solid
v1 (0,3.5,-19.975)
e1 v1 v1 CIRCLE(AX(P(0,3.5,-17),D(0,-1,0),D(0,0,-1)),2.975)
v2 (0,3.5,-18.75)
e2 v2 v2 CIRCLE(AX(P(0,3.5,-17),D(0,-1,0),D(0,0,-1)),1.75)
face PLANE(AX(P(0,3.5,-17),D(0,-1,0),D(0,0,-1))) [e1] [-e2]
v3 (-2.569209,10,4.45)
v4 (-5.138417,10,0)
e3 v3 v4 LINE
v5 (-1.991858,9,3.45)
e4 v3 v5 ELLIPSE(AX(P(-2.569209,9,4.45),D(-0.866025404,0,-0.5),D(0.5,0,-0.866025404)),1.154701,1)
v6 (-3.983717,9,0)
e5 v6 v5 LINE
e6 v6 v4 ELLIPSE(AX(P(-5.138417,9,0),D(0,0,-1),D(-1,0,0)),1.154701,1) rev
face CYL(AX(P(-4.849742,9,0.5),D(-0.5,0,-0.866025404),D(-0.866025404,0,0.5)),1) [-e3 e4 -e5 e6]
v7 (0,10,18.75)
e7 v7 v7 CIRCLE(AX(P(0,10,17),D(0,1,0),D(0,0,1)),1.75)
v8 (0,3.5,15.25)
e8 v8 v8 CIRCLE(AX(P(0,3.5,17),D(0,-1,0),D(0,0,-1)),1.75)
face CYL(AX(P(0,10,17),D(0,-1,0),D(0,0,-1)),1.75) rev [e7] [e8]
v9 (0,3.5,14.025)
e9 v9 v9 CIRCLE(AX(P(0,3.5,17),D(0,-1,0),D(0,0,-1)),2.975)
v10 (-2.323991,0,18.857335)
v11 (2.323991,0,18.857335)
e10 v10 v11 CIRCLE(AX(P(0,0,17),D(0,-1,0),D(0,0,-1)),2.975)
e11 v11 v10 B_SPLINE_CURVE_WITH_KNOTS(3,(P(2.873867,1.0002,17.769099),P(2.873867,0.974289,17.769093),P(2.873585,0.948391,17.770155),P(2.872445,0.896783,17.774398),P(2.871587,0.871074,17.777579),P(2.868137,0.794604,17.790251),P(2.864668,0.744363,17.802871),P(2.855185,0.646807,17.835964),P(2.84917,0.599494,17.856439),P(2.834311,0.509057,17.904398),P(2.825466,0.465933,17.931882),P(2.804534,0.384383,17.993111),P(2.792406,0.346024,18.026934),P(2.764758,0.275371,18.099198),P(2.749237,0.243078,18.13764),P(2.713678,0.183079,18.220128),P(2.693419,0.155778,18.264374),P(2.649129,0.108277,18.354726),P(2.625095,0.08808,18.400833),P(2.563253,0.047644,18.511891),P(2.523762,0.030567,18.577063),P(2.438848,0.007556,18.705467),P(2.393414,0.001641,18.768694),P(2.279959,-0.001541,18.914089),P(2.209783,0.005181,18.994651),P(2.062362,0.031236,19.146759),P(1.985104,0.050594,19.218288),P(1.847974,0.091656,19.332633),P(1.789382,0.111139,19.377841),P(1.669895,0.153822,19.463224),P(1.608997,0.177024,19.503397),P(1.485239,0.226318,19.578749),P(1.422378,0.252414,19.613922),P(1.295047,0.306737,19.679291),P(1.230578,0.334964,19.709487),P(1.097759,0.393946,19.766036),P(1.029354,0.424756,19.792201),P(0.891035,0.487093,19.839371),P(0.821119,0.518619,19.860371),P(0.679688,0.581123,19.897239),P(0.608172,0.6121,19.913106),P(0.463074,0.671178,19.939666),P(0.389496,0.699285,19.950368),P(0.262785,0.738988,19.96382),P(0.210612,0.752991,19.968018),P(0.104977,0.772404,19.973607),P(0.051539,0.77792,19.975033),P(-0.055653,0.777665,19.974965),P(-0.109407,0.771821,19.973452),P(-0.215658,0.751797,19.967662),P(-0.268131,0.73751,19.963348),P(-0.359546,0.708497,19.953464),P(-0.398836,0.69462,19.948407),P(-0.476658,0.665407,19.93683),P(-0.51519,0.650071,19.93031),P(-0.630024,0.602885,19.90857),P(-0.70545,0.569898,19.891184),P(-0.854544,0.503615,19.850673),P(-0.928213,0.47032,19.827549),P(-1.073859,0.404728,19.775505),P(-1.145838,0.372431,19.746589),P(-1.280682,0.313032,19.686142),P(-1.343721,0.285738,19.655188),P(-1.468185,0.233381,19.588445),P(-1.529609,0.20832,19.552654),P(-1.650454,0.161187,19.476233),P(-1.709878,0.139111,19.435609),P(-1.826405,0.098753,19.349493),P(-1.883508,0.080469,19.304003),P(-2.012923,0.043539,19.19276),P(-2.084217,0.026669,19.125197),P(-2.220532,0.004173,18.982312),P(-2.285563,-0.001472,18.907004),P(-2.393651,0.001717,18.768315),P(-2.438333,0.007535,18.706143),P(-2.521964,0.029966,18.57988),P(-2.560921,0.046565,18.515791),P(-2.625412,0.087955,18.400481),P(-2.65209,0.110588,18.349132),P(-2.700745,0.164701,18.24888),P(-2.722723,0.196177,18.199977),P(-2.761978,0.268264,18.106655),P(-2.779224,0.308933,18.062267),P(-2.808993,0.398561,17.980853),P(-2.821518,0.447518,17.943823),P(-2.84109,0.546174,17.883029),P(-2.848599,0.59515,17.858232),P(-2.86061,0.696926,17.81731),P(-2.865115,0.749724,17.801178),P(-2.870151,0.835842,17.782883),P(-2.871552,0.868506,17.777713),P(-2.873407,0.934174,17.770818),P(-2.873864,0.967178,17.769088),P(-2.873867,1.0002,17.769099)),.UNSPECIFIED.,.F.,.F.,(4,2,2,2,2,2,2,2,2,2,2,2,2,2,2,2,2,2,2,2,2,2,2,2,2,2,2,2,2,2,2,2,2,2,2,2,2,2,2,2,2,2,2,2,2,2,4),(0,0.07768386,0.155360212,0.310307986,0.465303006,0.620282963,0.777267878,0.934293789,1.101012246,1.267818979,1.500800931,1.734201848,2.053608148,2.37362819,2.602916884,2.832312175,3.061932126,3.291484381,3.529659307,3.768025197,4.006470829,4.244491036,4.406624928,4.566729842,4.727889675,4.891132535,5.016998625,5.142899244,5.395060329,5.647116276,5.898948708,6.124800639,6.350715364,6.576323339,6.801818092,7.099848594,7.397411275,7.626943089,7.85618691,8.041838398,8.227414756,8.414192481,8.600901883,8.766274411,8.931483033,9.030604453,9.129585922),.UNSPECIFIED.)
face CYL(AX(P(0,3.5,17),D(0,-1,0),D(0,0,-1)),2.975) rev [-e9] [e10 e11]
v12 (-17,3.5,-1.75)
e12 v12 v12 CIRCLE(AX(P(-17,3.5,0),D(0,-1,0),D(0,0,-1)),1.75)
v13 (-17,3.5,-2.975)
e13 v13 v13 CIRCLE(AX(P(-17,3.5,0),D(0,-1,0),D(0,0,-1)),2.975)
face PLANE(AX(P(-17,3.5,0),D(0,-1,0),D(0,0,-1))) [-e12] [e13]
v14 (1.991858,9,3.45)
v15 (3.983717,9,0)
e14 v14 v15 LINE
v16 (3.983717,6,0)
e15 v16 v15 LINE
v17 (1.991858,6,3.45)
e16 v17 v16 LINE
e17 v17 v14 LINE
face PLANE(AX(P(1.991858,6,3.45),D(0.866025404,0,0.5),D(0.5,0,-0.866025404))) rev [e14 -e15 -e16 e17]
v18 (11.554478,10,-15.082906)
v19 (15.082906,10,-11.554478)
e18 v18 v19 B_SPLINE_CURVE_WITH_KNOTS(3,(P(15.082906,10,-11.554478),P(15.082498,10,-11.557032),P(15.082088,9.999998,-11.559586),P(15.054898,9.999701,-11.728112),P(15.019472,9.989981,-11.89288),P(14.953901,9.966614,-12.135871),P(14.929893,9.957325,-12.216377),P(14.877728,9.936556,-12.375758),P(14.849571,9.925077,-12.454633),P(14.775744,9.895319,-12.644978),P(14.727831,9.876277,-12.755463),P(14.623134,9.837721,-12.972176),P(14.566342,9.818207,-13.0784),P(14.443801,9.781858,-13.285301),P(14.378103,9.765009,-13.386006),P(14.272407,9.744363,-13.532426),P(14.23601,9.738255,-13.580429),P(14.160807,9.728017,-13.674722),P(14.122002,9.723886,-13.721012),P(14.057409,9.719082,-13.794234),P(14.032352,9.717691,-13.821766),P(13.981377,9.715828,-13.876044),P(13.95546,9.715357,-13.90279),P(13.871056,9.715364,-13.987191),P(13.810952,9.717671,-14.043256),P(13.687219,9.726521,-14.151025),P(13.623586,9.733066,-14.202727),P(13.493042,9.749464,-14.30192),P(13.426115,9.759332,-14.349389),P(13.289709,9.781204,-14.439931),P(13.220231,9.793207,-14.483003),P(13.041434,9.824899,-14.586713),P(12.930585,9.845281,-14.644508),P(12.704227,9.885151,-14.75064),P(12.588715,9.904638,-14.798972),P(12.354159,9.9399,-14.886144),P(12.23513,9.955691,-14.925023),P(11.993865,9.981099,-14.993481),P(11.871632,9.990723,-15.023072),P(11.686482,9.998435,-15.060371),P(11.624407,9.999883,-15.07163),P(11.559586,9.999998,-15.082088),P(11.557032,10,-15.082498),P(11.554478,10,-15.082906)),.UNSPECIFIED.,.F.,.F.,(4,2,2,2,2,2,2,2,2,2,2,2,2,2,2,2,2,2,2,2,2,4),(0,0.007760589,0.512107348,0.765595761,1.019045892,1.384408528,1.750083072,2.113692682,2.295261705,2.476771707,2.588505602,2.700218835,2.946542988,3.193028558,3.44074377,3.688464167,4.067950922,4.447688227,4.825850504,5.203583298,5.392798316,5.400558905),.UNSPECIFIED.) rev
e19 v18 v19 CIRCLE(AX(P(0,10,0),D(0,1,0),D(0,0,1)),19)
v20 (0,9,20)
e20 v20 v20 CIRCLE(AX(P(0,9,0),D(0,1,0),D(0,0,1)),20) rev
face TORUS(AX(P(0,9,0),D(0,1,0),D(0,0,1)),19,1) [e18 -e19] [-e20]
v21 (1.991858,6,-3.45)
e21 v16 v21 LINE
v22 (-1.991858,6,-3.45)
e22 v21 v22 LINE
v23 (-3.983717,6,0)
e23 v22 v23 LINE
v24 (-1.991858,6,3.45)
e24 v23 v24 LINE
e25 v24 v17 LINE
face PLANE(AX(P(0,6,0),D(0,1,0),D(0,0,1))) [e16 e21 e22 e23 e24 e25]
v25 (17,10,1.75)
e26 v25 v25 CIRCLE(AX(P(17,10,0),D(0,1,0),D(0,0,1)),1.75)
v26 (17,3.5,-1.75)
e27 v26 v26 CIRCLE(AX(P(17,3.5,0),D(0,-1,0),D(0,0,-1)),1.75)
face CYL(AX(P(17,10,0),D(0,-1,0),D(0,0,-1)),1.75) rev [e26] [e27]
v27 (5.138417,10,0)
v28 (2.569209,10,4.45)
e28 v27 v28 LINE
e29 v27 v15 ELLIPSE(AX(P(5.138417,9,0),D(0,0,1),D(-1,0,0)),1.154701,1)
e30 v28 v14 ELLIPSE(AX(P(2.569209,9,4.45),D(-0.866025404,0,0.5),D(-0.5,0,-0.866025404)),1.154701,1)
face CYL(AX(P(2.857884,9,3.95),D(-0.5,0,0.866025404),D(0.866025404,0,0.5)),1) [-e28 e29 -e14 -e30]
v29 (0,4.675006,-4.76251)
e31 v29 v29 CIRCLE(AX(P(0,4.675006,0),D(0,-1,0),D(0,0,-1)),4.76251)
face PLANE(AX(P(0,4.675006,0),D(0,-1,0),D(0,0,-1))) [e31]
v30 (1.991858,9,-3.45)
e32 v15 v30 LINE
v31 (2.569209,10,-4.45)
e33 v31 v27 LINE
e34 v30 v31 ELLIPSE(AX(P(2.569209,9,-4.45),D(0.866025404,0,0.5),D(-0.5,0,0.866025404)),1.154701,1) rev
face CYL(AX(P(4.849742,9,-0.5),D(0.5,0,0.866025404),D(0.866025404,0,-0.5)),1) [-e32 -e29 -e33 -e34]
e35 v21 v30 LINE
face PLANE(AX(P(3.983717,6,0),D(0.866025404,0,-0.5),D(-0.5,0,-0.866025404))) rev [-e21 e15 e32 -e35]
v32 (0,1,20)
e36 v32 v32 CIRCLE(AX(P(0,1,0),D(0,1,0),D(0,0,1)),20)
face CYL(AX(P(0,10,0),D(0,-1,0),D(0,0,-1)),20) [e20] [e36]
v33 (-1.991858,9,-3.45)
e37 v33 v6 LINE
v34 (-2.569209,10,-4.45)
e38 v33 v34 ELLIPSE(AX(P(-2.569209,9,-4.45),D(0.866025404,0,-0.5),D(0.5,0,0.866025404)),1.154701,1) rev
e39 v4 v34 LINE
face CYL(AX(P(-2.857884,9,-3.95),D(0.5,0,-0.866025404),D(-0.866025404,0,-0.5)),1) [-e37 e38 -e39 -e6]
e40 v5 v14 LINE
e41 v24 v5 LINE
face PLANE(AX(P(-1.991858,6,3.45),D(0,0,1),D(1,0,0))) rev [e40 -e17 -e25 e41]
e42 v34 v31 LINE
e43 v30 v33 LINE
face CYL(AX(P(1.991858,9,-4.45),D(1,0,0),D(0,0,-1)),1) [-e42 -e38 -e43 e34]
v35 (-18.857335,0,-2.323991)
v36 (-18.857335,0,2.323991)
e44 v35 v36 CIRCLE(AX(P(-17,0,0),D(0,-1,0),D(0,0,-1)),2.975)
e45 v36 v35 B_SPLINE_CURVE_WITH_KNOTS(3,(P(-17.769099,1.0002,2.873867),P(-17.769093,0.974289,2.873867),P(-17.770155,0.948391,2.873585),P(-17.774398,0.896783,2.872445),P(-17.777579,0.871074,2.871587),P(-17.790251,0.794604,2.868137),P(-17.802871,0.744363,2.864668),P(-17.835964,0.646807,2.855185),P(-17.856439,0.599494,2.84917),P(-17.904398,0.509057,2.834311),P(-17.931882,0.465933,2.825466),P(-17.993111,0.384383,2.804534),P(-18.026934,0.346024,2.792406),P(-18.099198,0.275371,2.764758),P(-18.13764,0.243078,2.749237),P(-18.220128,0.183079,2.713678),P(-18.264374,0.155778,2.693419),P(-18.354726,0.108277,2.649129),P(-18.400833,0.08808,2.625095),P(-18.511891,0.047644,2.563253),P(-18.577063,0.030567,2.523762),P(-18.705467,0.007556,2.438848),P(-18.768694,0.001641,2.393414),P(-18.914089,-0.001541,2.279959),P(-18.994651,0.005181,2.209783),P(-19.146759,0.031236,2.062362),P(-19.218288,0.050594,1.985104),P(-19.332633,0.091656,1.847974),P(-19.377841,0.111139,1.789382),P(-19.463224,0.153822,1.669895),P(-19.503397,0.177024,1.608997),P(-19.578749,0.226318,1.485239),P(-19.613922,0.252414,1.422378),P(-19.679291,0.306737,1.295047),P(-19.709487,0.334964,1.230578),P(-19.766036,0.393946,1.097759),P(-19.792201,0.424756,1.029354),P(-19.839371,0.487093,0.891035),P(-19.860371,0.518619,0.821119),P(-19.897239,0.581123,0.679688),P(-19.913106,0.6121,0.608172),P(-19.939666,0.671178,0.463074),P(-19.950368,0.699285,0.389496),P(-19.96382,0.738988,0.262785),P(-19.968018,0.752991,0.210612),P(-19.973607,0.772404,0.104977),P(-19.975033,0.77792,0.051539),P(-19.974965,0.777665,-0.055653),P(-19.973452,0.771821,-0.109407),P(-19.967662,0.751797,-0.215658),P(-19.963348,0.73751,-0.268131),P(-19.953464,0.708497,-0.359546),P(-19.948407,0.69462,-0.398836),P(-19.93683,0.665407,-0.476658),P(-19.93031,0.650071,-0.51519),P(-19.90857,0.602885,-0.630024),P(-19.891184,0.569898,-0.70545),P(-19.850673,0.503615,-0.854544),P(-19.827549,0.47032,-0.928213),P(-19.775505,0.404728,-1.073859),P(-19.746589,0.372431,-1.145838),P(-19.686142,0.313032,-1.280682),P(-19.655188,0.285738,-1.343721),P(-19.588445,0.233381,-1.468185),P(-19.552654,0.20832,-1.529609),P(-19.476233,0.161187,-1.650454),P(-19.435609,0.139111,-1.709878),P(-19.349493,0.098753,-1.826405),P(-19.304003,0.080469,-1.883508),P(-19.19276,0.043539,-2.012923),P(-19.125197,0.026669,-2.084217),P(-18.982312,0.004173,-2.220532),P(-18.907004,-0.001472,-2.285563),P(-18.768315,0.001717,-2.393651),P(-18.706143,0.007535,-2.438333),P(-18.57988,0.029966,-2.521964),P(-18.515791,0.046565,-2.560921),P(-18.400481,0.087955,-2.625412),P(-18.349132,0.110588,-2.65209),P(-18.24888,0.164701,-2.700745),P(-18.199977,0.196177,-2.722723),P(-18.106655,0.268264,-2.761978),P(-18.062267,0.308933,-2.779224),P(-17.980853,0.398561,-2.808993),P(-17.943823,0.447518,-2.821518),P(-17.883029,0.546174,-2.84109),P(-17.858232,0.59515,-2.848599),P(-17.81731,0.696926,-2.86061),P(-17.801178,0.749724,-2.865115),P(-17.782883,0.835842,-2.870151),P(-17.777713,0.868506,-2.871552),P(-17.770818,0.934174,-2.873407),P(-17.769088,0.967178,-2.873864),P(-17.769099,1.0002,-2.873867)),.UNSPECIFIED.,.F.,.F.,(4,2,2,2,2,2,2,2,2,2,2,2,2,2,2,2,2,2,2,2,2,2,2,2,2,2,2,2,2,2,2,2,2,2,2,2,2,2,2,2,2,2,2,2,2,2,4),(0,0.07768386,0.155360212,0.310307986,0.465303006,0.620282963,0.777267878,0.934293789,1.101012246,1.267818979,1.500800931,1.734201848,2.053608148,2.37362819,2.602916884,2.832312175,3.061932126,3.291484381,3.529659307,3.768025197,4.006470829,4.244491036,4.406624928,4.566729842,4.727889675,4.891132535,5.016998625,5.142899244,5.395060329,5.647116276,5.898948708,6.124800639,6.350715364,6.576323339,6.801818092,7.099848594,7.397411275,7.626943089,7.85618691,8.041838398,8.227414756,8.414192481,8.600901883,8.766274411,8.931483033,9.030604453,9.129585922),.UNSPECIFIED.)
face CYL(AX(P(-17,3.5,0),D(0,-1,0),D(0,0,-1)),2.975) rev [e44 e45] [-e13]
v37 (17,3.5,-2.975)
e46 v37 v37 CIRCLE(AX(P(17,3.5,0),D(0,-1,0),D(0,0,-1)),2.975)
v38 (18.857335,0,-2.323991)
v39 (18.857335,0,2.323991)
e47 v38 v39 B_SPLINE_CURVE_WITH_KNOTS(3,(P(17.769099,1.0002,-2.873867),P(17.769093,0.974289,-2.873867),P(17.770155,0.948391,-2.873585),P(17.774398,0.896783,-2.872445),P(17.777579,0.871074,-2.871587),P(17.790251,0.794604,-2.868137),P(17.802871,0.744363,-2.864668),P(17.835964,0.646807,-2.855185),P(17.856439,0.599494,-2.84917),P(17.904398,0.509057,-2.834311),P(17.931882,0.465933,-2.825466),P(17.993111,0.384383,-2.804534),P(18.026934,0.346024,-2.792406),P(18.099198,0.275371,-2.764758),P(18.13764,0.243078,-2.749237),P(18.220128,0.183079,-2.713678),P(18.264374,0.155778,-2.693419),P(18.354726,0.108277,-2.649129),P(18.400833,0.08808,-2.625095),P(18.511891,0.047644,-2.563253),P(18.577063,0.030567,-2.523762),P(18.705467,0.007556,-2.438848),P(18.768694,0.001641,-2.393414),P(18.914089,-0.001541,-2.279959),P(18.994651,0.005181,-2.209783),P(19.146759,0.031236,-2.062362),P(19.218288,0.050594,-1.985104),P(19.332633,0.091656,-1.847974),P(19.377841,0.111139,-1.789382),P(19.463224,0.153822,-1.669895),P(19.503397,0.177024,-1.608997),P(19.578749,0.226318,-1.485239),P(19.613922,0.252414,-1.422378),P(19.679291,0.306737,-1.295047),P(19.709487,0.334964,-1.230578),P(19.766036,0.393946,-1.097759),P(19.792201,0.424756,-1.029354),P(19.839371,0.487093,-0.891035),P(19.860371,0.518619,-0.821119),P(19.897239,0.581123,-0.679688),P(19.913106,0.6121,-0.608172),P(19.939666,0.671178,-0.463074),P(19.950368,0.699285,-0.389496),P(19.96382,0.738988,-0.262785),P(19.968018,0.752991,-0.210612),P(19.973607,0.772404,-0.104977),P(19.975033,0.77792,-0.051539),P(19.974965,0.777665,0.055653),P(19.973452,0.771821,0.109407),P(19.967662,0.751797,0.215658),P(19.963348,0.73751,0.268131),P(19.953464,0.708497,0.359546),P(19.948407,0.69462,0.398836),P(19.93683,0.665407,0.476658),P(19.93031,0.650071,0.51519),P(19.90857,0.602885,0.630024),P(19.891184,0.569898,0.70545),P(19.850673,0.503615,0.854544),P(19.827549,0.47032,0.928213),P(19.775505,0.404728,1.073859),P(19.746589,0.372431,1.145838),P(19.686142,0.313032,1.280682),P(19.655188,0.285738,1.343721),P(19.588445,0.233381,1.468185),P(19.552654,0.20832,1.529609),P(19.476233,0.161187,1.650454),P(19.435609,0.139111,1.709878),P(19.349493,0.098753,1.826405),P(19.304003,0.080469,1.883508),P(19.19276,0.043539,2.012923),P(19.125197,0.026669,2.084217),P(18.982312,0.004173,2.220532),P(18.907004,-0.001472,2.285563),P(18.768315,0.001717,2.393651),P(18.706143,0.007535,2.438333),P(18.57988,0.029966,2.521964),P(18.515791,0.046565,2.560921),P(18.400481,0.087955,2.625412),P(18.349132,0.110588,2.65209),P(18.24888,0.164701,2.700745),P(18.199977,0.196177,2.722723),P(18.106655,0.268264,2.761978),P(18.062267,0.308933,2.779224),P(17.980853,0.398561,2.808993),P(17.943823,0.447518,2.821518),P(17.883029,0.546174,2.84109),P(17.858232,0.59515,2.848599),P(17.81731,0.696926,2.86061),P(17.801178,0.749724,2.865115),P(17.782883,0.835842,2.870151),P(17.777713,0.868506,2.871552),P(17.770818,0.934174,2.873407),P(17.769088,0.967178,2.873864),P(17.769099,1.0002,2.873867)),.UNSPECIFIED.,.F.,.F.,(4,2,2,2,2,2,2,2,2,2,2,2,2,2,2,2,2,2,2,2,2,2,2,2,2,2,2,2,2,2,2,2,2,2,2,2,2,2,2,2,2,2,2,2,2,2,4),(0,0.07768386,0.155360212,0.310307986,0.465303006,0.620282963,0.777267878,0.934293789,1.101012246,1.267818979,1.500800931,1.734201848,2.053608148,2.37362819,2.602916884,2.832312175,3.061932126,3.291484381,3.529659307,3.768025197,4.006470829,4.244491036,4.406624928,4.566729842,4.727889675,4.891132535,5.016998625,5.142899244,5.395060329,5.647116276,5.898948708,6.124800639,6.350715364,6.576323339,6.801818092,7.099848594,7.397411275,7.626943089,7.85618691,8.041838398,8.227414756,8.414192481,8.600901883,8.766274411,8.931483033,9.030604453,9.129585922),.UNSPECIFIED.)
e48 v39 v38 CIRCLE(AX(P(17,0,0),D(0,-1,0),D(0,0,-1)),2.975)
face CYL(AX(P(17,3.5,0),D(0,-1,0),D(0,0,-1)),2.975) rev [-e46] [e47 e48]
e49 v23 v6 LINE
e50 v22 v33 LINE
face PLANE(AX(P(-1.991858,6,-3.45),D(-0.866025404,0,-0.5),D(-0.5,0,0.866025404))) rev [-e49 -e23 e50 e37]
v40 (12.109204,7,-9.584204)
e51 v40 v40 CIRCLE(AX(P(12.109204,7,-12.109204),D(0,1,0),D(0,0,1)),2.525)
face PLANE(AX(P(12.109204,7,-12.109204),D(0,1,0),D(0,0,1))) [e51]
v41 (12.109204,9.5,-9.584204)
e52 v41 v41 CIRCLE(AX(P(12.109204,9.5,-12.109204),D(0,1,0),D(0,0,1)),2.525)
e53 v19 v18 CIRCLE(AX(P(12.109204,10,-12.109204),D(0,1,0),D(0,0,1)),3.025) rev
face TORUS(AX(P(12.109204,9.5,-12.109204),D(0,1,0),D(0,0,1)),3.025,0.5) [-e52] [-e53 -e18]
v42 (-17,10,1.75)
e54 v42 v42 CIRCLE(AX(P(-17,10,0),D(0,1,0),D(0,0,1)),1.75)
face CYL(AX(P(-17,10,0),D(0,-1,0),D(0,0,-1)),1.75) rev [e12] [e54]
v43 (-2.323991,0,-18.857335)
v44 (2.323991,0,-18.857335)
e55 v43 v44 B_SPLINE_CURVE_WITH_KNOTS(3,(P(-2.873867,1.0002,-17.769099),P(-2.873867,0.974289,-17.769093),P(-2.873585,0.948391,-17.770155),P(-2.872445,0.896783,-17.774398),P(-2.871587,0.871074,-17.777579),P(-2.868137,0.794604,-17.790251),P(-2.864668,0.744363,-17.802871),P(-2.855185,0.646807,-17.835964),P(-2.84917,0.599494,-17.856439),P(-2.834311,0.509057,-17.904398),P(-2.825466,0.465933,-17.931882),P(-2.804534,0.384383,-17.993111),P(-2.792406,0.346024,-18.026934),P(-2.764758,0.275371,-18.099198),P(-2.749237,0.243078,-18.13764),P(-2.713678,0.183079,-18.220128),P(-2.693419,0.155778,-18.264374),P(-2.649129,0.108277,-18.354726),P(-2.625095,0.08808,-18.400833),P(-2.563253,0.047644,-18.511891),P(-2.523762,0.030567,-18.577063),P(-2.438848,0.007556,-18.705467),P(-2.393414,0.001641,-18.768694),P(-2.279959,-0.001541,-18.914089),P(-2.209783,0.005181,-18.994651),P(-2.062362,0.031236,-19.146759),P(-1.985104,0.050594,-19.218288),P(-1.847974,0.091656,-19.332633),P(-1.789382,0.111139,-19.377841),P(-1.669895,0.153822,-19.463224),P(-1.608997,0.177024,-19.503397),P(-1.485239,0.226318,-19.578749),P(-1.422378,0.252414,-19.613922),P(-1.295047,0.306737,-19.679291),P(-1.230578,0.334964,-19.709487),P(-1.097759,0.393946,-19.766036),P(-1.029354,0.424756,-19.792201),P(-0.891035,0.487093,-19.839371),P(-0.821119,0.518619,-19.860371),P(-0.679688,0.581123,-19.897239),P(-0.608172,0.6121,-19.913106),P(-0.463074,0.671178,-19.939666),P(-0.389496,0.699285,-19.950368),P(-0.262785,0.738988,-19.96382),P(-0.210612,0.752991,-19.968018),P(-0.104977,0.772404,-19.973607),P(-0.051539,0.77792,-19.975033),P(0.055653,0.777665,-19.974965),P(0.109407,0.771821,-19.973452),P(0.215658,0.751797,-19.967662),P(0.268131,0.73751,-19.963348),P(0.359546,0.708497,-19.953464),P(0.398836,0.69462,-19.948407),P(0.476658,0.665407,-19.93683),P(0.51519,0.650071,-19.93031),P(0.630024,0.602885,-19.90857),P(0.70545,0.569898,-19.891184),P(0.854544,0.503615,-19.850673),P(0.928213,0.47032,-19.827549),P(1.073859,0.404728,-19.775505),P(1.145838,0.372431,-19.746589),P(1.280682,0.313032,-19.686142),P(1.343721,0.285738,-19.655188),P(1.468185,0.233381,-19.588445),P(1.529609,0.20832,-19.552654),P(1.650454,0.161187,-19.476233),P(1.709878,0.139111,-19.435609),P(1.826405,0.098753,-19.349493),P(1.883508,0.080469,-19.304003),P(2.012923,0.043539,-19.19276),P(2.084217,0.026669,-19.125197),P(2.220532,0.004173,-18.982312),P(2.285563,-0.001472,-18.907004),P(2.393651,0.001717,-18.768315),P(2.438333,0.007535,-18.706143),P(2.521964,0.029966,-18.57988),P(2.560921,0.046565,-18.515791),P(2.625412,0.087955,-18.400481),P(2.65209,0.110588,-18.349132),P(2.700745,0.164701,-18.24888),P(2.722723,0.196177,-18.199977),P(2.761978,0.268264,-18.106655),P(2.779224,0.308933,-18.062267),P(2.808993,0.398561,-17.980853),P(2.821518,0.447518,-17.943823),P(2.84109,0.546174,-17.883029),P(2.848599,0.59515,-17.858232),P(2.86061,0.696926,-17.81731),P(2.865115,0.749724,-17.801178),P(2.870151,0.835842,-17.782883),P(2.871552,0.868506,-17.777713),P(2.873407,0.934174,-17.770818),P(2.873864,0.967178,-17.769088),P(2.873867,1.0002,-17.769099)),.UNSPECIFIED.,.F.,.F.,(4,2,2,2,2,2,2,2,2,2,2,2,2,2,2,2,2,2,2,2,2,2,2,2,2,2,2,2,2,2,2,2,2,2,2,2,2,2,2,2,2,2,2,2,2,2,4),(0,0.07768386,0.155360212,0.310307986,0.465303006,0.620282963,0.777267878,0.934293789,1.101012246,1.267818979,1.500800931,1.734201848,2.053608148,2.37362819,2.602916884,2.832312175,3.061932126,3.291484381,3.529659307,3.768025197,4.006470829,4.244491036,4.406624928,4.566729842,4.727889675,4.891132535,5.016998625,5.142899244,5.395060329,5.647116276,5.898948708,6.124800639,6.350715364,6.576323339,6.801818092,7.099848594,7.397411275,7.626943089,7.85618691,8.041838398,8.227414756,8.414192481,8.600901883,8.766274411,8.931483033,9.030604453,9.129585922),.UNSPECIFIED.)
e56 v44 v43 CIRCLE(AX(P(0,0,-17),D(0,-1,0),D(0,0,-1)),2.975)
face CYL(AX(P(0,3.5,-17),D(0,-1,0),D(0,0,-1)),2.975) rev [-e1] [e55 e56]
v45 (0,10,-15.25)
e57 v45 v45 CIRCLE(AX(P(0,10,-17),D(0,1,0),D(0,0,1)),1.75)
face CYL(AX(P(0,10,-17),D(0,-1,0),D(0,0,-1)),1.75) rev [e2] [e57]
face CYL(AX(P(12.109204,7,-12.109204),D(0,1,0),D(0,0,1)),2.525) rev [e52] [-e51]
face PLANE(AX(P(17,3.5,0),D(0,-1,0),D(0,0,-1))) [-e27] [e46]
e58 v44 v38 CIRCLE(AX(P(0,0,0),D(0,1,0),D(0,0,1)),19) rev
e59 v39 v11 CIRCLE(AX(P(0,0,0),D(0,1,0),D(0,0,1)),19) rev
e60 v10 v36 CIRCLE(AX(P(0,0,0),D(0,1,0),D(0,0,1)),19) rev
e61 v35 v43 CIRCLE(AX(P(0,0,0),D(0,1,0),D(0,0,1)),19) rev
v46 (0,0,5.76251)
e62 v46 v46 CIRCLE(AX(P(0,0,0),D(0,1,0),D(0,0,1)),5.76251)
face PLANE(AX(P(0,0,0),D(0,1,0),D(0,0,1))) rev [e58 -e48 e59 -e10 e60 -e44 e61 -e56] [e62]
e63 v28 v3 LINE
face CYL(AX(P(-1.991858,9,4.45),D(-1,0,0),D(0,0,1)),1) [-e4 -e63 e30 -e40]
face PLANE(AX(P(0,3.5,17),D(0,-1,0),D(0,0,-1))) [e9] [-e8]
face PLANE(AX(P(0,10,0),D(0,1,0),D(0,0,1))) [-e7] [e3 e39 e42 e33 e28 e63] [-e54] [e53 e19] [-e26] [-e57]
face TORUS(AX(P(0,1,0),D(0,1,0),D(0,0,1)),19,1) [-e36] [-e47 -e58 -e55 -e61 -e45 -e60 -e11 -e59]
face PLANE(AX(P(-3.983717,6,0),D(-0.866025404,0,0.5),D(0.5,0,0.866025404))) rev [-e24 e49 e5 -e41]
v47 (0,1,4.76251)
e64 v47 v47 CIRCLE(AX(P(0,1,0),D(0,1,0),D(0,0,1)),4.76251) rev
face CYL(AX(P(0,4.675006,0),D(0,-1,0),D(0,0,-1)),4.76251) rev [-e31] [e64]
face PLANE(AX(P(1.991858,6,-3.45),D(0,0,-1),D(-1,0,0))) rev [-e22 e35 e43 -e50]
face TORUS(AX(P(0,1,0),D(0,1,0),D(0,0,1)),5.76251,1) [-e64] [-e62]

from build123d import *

# Parameters (mm, degrees)
SKETCH1_R           = 20
SKETCH1_R_2         = 1.75
BOSS_EXTRUDE1_DEPTH = 10
CUT_EXTRUDE1_DEPTH  = 4
SKETCH3_R           = 4.762509525
CUT_EXTRUDE2_DEPTH  = 4.67500635
FILLET1_R           = 1
SKETCH4_R           = 2.975
CUT_EXTRUDE3_DEPTH  = 3.5
SKETCH5_R           = 2.525
CUT_EXTRUDE4_DEPTH  = 3


with BuildPart() as part:
    # Sketch1 → Boss-Extrude1 (new body)
    with BuildSketch(Plane(origin=(0, 0, 0), x_dir=(1, 0, 0), z_dir=(0, 1, 0))):
        with Locations(Location((0, 0, 0), (0, 0, 270))):
            Circle(SKETCH1_R)
        with Locations(Location((17, 0, 0), (0, 0, 270))):
            Circle(SKETCH1_R_2, mode=Mode.SUBTRACT)
        with Locations(Location((0, -17, 0), (0, 0, 270))):
            Circle(SKETCH1_R_2, mode=Mode.SUBTRACT)
        with Locations(Location((-17, 0, 0), (0, 0, 270))):
            Circle(SKETCH1_R_2, mode=Mode.SUBTRACT)
        with Locations(Location((0, 17, 0), (0, 0, 270))):
            Circle(SKETCH1_R_2, mode=Mode.SUBTRACT)
    extrude(amount=BOSS_EXTRUDE1_DEPTH)

    # Sketch2 → Cut-Extrude1 (cut)
    with BuildSketch(Plane(origin=(0, 10, 0), x_dir=(1, 0, 0), z_dir=(0, 1, 0))):
        Polygon((3.983716857, 0), (1.991858429, 3.45), (-1.991858429, 3.45), (-3.983716857, 0), (-1.991858429, -3.45), (1.991858429, -3.45), align=None)
    extrude(amount=-CUT_EXTRUDE1_DEPTH, mode=Mode.SUBTRACT)

    # Sketch3 → Cut-Extrude2 (cut)
    with BuildSketch(Plane.XZ):
        with Locations(Location((0, 0, 0), (0, 0, 270))):
            Circle(SKETCH3_R)
    extrude(amount=-CUT_EXTRUDE2_DEPTH, mode=Mode.SUBTRACT)

    # Fillet1
    fillet1_edges = [part.edges().sort_by_distance(p)[0] for p in [
        (0, 0, -20),
        (2.987787643, 10, 1.725),
        (2.987787643, 10, -1.725),
        (0, 10, -3.45),
        (-2.987787643, 10, -1.725),
        (-2.987787643, 10, 1.725),
        (0, 10, 3.45),
        (0, 0, 4.762509525),
        (0, 10, -20),
    ]]
    fillet(fillet1_edges, radius=FILLET1_R)

    # Sketch4 → Cut-Extrude3 (cut)
    with BuildSketch(Plane.XZ):
        with Locations(Location((-17, 0, 0), (0, 0, 270))):
            Circle(SKETCH4_R)
        with Locations(Location((0, 17, 0), (0, 0, 270))):
            Circle(SKETCH4_R)
        with Locations(Location((17, 0, 0), (0, 0, 270))):
            Circle(SKETCH4_R)
        with Locations(Location((0, -17, 0), (0, 0, 270))):
            Circle(SKETCH4_R)
    extrude(amount=-CUT_EXTRUDE3_DEPTH, mode=Mode.SUBTRACT)

    # Sketch5 → Cut-Extrude4 (cut)
    with BuildSketch(Plane(origin=(0, 10, 0), x_dir=(1, 0, 0), z_dir=(0, 1, 0))):
        with Locations(Location((12.109203628, 12.109203628, 0), (0, 0, 270))):
            Circle(SKETCH5_R)
    extrude(amount=-CUT_EXTRUDE4_DEPTH, mode=Mode.SUBTRACT)

    # Fillet2: read off the stored shape, not the designer's step
    # Fillet2 outline → Fillet2 (revolve, cut)
    with BuildSketch(Plane(origin=(12.109203628, 0, -12.109203628), x_dir=(1, 0, 0), z_dir=(0, 0, 1))):
        with BuildLine():
            ThreePointArc((2.525, 9.5), (2.671446609, 9.853553391), (3.025, 10))
            Line((3.025, 10), (2.525, 10))
            Line((2.525, 10), (2.525, 9.5))
        make_face()
    revolve(axis=Axis((12.109203628, 0, -12.109203628), (0, 1, 0)), mode=Mode.SUBTRACT)


solid = part.part
